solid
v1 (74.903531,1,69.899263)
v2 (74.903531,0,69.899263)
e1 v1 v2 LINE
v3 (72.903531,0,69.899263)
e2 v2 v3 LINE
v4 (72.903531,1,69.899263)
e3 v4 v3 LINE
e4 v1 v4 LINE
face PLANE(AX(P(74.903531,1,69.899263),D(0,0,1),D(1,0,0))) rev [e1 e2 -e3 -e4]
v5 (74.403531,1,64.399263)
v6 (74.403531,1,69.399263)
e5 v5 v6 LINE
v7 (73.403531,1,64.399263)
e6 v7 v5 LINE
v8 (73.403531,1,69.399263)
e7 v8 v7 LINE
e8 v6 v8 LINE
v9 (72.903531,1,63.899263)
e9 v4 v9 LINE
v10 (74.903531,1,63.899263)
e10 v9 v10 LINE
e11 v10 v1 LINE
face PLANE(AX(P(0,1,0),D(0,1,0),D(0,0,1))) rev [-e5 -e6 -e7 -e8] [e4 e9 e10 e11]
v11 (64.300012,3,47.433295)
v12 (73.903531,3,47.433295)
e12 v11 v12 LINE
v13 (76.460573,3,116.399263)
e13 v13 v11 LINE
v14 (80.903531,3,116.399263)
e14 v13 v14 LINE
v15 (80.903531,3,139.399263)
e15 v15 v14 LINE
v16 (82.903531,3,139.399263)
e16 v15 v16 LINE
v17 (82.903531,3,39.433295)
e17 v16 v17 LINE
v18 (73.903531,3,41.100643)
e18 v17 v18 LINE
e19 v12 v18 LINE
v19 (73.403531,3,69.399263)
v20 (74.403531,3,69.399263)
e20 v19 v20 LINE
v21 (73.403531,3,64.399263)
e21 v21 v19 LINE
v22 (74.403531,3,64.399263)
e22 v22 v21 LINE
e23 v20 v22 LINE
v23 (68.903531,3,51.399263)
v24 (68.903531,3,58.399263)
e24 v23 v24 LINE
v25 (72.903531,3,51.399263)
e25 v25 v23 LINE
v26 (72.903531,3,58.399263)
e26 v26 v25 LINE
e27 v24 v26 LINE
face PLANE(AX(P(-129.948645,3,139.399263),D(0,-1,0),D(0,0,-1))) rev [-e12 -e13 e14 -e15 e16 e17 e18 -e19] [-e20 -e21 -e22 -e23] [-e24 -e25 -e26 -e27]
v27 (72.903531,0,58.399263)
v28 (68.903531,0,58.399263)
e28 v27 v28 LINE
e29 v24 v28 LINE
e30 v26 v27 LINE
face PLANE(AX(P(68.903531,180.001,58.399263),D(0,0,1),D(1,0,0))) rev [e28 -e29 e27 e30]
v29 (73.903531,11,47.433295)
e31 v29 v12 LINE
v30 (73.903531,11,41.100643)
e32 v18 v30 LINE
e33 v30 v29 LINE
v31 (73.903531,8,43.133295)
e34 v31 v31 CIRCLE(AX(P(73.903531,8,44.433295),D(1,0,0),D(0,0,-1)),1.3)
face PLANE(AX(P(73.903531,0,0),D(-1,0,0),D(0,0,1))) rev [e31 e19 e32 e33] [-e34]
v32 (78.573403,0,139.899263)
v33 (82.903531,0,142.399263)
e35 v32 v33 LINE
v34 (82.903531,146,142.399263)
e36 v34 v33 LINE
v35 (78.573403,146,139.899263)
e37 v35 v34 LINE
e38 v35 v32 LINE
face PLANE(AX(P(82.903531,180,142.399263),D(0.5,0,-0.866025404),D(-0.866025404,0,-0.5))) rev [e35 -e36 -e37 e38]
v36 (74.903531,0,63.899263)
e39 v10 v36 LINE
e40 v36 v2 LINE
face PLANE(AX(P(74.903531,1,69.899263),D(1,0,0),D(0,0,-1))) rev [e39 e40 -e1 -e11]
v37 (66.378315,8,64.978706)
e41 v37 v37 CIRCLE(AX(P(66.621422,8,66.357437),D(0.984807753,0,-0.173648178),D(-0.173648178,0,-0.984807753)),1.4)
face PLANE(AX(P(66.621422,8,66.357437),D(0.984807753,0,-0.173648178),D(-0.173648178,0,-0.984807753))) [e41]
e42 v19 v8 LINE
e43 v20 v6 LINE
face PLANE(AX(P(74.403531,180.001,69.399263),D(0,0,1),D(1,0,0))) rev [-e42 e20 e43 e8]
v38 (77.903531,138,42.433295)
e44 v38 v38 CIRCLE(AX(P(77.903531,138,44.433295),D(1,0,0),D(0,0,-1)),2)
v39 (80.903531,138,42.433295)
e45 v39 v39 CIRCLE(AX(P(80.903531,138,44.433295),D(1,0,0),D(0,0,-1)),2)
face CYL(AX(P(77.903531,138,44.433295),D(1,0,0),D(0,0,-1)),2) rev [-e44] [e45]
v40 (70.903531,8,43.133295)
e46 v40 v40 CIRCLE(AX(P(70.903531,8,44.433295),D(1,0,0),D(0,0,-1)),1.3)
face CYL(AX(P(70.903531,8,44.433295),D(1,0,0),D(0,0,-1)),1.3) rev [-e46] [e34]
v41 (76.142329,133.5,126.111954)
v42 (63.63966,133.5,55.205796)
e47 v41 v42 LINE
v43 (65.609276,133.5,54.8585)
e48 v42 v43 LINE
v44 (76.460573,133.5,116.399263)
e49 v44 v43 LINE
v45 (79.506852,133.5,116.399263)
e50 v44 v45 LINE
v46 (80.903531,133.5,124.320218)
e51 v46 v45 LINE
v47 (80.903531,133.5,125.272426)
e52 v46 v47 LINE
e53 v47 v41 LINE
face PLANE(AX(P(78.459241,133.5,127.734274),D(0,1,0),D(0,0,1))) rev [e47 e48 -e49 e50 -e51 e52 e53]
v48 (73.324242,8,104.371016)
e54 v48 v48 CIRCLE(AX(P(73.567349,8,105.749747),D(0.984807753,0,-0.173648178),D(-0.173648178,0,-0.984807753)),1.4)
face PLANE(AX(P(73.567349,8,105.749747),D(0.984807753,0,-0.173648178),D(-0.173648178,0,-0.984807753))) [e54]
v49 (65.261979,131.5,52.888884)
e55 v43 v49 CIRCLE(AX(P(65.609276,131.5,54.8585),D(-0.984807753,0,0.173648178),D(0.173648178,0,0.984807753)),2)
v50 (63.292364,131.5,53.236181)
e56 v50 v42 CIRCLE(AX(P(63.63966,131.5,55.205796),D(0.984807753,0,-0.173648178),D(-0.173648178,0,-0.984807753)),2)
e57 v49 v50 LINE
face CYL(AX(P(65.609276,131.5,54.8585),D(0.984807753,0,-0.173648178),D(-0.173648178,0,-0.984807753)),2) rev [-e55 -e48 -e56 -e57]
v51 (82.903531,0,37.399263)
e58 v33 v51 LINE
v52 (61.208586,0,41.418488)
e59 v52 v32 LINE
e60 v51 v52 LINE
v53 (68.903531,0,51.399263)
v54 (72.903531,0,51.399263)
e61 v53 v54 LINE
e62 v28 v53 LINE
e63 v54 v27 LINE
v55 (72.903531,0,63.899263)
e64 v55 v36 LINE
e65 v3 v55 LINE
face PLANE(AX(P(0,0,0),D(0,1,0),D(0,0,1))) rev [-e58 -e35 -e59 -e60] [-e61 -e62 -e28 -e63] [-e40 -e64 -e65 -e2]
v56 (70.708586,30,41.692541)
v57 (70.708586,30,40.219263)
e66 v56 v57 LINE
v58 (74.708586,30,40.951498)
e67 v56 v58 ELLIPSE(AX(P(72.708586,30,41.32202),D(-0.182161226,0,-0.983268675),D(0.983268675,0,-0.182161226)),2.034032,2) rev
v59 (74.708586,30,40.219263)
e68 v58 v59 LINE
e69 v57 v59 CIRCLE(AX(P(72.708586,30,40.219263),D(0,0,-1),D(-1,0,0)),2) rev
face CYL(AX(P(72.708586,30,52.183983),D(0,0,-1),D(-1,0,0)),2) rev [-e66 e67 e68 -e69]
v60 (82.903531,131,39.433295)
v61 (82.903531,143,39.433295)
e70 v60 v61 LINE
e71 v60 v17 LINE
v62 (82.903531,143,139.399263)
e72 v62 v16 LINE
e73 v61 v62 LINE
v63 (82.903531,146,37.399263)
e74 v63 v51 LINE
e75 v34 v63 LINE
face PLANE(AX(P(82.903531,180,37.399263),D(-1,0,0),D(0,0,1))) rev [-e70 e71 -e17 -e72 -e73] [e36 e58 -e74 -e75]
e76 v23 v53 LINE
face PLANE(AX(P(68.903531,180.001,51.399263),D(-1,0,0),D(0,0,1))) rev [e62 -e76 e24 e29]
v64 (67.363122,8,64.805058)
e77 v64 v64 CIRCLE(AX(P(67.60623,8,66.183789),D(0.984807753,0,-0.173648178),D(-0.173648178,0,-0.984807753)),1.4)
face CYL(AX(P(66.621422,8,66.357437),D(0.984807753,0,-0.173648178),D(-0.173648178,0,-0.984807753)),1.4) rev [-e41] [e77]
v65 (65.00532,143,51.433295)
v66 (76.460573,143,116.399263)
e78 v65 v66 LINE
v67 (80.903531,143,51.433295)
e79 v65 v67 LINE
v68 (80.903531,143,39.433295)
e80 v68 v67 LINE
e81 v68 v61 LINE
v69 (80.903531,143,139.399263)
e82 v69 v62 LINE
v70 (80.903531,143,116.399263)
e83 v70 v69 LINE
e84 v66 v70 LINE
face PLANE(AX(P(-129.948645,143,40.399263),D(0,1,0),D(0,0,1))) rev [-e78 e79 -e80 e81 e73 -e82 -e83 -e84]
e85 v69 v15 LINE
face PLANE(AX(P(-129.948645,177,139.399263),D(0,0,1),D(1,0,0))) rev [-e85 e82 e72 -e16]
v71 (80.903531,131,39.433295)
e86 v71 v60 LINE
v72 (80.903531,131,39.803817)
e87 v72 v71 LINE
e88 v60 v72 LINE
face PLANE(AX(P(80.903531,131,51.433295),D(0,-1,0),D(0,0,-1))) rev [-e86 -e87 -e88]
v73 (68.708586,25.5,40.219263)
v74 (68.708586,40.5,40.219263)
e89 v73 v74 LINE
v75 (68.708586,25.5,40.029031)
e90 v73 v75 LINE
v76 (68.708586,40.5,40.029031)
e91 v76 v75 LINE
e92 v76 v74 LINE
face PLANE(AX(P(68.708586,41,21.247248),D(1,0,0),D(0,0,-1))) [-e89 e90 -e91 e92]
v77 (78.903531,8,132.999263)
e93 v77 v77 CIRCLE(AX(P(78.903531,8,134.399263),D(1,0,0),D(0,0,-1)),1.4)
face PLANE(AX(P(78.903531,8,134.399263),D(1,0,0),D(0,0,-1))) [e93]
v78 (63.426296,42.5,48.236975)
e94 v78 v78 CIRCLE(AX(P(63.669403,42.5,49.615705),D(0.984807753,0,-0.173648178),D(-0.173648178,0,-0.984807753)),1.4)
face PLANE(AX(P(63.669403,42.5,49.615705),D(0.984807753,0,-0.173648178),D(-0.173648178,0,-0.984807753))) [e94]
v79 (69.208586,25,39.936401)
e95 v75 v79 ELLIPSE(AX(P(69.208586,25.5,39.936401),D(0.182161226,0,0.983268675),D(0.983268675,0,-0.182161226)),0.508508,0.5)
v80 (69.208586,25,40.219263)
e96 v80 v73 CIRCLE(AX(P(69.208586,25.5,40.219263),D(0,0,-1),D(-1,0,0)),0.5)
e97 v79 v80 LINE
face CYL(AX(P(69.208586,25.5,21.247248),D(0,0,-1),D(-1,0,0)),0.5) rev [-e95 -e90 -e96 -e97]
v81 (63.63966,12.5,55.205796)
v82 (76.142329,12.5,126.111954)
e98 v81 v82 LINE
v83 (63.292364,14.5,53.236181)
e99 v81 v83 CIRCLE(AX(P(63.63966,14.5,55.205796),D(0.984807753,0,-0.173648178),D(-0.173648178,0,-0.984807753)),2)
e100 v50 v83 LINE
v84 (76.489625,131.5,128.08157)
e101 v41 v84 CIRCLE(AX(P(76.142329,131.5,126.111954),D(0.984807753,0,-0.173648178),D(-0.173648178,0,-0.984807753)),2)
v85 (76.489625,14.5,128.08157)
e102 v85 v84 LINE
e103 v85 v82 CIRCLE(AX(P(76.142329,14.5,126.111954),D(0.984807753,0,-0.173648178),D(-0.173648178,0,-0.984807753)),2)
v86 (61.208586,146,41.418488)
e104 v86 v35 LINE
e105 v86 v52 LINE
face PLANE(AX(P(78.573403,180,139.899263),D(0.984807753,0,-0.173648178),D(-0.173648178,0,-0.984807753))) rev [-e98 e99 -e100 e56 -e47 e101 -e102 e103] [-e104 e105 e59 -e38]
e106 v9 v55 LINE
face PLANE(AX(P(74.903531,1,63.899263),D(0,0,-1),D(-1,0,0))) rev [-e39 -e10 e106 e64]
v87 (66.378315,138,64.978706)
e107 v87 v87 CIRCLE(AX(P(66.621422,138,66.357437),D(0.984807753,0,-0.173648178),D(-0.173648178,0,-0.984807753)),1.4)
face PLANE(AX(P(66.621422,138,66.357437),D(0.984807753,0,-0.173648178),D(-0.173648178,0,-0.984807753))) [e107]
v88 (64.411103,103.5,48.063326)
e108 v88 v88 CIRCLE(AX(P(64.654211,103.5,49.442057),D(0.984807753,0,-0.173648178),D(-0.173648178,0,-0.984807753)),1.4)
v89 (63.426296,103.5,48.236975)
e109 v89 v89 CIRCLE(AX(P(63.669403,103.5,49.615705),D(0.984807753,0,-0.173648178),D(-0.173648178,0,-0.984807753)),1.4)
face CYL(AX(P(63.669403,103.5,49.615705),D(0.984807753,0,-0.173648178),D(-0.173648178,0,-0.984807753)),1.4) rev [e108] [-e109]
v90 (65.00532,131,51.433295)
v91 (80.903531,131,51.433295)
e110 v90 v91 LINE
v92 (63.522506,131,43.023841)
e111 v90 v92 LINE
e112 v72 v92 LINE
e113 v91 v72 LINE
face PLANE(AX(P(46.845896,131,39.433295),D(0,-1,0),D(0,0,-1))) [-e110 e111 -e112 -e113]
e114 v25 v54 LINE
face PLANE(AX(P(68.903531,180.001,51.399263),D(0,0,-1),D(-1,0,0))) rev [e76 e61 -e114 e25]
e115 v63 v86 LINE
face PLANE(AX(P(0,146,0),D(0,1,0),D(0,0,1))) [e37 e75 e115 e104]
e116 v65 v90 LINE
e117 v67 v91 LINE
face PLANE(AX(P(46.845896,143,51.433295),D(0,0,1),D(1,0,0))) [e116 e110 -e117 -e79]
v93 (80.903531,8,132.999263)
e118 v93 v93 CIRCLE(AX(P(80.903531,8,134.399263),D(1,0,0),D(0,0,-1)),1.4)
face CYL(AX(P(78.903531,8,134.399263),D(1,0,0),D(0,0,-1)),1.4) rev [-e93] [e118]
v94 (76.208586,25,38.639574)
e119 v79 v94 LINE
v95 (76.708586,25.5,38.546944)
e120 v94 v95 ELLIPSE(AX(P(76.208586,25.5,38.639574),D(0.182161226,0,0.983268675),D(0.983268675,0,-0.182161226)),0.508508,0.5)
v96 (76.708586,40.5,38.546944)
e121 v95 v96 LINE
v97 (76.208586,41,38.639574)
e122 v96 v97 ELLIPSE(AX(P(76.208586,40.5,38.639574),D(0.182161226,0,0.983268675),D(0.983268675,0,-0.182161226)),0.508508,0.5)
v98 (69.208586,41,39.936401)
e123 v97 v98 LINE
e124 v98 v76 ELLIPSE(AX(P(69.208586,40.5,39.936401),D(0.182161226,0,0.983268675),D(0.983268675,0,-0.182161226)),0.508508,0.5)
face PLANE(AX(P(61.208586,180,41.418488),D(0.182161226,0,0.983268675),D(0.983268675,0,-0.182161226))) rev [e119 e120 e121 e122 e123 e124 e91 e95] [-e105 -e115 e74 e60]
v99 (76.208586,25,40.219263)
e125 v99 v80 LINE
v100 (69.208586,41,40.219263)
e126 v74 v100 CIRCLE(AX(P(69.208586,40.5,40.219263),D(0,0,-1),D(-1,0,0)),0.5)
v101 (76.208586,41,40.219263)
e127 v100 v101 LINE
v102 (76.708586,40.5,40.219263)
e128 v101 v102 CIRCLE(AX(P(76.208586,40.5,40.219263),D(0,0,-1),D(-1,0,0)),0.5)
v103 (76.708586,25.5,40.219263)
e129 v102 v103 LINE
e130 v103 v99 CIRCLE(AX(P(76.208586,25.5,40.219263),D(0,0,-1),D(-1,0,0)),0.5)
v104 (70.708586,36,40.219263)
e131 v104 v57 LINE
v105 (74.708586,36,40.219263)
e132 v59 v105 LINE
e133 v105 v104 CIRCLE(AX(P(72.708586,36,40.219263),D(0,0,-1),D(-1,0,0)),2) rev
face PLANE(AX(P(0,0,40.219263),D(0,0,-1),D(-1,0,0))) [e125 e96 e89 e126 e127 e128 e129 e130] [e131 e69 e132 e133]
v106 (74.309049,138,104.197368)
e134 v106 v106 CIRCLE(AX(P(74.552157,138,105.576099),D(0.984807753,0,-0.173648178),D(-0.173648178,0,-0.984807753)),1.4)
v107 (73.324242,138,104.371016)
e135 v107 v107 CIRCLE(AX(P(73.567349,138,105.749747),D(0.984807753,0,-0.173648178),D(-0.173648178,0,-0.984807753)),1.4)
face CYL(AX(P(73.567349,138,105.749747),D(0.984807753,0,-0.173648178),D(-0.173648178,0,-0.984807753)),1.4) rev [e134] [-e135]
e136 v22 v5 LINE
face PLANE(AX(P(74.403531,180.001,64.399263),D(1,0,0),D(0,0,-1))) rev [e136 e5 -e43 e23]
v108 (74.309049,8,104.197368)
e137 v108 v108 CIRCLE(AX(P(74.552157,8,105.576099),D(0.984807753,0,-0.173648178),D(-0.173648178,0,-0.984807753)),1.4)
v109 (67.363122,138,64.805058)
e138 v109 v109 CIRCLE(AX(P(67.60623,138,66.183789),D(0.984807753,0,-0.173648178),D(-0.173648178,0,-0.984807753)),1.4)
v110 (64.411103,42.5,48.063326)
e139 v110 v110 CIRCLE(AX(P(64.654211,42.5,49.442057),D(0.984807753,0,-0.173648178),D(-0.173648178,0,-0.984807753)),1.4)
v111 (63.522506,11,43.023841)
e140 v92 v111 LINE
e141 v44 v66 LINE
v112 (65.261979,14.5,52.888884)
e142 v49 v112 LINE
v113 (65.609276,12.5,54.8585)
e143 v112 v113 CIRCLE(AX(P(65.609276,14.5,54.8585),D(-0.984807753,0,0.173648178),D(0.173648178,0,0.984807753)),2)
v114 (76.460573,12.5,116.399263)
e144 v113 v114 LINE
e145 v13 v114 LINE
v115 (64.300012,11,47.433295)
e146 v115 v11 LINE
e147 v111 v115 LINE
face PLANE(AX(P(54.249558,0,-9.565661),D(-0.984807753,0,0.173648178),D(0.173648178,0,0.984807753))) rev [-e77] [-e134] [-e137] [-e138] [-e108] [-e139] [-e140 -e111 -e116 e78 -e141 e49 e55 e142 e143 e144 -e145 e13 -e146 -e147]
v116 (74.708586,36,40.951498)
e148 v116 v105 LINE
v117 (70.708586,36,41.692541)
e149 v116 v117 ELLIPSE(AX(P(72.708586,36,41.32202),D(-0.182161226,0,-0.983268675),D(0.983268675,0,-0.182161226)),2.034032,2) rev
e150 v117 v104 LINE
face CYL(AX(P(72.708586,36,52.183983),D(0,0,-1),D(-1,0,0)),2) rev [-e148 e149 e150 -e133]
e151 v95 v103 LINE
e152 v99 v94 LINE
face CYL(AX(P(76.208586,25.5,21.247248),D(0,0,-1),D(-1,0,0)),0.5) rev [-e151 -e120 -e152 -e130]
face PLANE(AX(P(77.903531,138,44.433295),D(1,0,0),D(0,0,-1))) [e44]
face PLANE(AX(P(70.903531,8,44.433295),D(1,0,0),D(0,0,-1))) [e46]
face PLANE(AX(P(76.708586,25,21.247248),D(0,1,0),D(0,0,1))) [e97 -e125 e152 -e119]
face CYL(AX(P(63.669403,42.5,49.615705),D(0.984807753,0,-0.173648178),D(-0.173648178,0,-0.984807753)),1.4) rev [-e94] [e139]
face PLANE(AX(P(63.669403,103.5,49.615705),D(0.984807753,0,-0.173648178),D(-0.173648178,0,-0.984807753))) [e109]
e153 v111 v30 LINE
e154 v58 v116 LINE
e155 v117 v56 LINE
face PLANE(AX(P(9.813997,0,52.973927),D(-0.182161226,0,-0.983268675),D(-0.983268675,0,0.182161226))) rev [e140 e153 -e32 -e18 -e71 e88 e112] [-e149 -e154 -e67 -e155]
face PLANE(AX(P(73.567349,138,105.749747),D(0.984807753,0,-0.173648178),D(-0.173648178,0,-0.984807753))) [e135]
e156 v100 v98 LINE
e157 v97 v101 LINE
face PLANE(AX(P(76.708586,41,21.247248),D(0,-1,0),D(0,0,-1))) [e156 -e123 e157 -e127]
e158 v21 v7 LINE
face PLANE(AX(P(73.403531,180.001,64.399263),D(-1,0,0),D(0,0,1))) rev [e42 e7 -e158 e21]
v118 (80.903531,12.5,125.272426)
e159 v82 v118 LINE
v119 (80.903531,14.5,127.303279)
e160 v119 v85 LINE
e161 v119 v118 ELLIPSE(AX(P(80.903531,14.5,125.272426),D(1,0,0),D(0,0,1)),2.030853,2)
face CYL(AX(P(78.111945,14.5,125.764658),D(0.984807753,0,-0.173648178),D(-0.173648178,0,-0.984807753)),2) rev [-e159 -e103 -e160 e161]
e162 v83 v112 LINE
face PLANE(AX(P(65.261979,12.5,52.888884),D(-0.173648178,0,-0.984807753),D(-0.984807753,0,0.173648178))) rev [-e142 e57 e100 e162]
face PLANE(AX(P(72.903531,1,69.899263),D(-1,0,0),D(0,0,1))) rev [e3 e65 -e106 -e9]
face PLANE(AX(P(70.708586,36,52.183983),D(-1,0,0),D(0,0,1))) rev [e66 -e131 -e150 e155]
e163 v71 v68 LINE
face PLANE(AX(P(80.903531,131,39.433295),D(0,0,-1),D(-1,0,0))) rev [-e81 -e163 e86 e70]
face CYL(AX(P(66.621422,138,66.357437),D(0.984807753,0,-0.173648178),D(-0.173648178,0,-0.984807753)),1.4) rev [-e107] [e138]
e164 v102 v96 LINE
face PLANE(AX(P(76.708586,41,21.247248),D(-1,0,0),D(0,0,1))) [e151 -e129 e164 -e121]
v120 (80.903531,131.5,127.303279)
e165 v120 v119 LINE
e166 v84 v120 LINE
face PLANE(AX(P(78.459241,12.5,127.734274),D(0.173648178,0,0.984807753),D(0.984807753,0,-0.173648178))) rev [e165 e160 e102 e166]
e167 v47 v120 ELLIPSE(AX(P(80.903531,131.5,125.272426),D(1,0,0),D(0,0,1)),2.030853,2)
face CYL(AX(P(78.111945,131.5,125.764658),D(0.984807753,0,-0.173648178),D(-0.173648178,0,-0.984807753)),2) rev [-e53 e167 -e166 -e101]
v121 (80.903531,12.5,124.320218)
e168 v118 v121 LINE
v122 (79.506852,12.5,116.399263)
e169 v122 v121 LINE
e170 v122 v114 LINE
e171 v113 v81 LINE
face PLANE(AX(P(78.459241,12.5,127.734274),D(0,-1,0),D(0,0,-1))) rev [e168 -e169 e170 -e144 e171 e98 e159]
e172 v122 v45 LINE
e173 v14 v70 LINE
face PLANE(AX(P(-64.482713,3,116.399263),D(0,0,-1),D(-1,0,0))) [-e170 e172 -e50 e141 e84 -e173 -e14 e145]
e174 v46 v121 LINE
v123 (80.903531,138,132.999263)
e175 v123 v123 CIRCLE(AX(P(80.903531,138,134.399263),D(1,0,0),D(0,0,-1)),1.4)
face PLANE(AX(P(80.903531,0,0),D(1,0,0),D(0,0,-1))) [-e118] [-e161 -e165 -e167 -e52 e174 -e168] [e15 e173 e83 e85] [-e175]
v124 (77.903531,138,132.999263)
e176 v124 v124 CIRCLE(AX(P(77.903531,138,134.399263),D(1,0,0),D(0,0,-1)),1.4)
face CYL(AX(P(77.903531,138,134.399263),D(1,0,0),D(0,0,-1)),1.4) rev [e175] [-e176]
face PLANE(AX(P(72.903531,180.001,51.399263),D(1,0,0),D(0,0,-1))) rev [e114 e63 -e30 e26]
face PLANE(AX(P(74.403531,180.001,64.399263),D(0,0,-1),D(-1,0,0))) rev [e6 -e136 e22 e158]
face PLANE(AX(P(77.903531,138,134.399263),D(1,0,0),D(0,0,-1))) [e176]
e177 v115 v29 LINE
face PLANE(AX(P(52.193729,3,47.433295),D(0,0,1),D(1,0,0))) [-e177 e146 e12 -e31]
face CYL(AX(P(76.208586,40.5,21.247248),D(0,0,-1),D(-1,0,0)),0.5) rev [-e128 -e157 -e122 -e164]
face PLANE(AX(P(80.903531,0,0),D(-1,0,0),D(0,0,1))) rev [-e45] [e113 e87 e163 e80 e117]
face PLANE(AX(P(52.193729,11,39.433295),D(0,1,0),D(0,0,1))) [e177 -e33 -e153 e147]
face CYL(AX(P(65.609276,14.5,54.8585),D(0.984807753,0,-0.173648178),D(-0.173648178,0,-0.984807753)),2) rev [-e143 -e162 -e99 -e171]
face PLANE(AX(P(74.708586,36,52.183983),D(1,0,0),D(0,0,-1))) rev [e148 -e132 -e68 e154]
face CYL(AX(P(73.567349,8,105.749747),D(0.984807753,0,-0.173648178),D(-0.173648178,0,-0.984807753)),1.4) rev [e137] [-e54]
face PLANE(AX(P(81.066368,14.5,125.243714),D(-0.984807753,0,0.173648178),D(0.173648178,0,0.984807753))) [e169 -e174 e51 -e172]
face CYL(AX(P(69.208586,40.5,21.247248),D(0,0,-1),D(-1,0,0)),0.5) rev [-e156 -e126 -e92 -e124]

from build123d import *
from build123d.topology import SkipClean

# Parameters (mm, degrees)
EXTRUDE_1_DEPTH      = 180
SKETCH_5_W           = 76
SKETCH_5_H           = 121
CUT_EXTRUDE_2_DEPTH  = 2
CUT_EXTRUDE_3_REACH  = 232.539
SKETCH_7_W           = 99
SKETCH_7_H           = 174
SKETCH_10_R          = 1.4
CUT_EXTRUDE_5_DEPTH  = 1
SKETCH_11_R          = 1.4
CUT_EXTRUDE_6_DEPTH  = 1
EXTRUDE_3_REACH      = 232.539
SKETCH_12_W          = 23
SKETCH_12_H          = 140
SKETCH_13_W          = 11.509871418
SKETCH_13_H          = 121
CUT_EXTRUDE_7_DEPTH  = 2
SKETCH_17_W          = 22.064106518
SKETCH_17_H          = 180
EXTRUDE_9_DEPTH      = 2
CUT_EXTRUDE_9_DEPTH  = 180
CUT_EXTRUDE_10_DEPTH = 174
SKETCH_20_W          = 23
SKETCH_20_H          = 140
CUT_EXTRUDE_11_DEPTH = 2
EXTRUDE_10_REACH     = 232.359
SKETCH_23_W          = 12
SKETCH_23_H          = 12
FILLET_4_R           = 2
CUT_EXTRUDE_15_REACH = 243.825
EXTRUDE_11_REACH     = 232.539
SKETCH_27_W          = 8
SKETCH_27_H          = 8
SKETCH_28_W          = 8
SKETCH_28_H          = 8
CUT_EXTRUDE_16_DEPTH = 9
EXTRUDE_12_DEPTH     = 8
CUT_EXTRUDE_17_REACH = 243.825
CUT_EXTRUDE_18_REACH = 246.03
SKETCH_31_W          = 4
SKETCH_31_H          = 7
CUT_EXTRUDE_23_REACH = 225.195
CUT_EXTRUDE_25_REACH = 224.966
SKETCH_35_W          = 8
SKETCH_35_H          = 16
FILLET_5_R           = 0.5
CUT_EXTRUDE_26_REACH = 246.03
SKETCH_36_W          = 1
SKETCH_36_H          = 5
SKETCH_37_W          = 2
SKETCH_37_H          = 6
CUT_EXTRUDE_27_DEPTH = 1
SKETCH_38_R          = 1.3
CUT_EXTRUDE_28_DEPTH = 3
SKETCH_39_R          = 2
CUT_EXTRUDE_30_DEPTH = 3
SKETCH_40_R          = 1.4
CUT_EXTRUDE_31_DEPTH = 2
CUT_EXTRUDE_34_DEPTH = 2
CUT_EXTRUDE_35_DEPTH = 1
SKETCH_45_W          = 45.630615172
SKETCH_45_H          = 107.719789164
CUT_EXTRUDE_36_DEPTH = 34
SKETCH_47_R          = 1.4
CUT_EXTRUDE_37_DEPTH = 3
EXTRUDE_13_REACH     = 207.096
SKETCH_48_W          = 12
SKETCH_48_H          = 12
SKETCH_50_W          = 12
SKETCH_50_H          = 12
CUT_EXTRUDE_38_DEPTH = 2
SKETCH_51_R          = 2
CUT_EXTRUDE_39_DEPTH = 3
CUT_EXTRUDE_40_DEPTH = 211.503077075


with BuildPart() as part:
    # 草图1 → 凸台-拉伸1 (new body)
    with BuildSketch(Plane(origin=(0, 0, 0), x_dir=(1, 0, 0), z_dir=(0, 1, 0))):
        Polygon((82.903530501, -37.399262949), (82.903530501, -142.399262949), (78.573403482, -139.899262949), (61.208585715, -41.418487648), align=None)
    extrude(amount=EXTRUDE_1_DEPTH)

    # 草图5 → 切除-拉伸2 (cut)
    with BuildSketch(Plane(origin=(52.279942479, 0, -9.218364409), x_dir=(0.17364817766692414, 0, 0.9848077530122091), z_dir=(-0.9848077530122091, 0, 0.17364817766692414))):
        with Locations((101.418007121, 73)):
            Rectangle(SKETCH_5_W, SKETCH_5_H)
    extrude(amount=-CUT_EXTRUDE_2_DEPTH, mode=Mode.SUBTRACT)

    # 切除-拉伸3: up to this plane
    cut_extrude_3_end = Plane(origin=(54.249557985, 0, -9.565660764), z_dir=(-0.9848077530122091, 0, 0.17364817766692406))
    # 草图7 → 切除-拉伸3 (cut, up to the surface)
    with BuildSketch(Plane(origin=(82.903530501, 0, 0), x_dir=(0, 0, -1), z_dir=(1, 0, 0)), mode=Mode.PRIVATE) as cut_extrude_3_sk1:
        with Locations((-89.899262949, 90)):
            Rectangle(SKETCH_7_W, SKETCH_7_H)
    cut_extrude_3_tool1 = split(extrude(cut_extrude_3_sk1.sketch, amount=-CUT_EXTRUDE_3_REACH, mode=Mode.PRIVATE), bisect_by=cut_extrude_3_end, keep=Keep.BOTH, mode=Mode.PRIVATE)
    add(cut_extrude_3_tool1.solids().sort_by_distance((82.903531, 90, 89.899263))[0], mode=Mode.SUBTRACT)

    # 草图10 → 切除-拉伸5 (cut)
    with BuildSketch(Plane(origin=(54.249557985, 0, -9.565660764), x_dir=(-0.1736481776669242, 0, -0.9848077530122091), z_dir=(0.9848077530122091, 0, -0.1736481776669242))):
        with Locations((-59.918007121, 103.5)):
            Circle(SKETCH_10_R)
        with Locations((-59.918007121, 42.5)):
            Circle(SKETCH_10_R)
    extrude(amount=-CUT_EXTRUDE_5_DEPTH, mode=Mode.SUBTRACT)

    # 草图11 → 切除-拉伸6 (cut)
    with BuildSketch(Plane(origin=(54.249557985, 0, -9.565660764), x_dir=(-0.1736481776669242, 0, -0.9848077530122091), z_dir=(0.9848077530122091, 0, -0.1736481776669242))):
        with Locations((-116.918007121, 138)):
            Circle(SKETCH_11_R)
        with Locations((-76.918007121, 138)):
            Circle(SKETCH_11_R)
        with Locations((-116.918007121, 8)):
            Circle(SKETCH_11_R)
        with Locations((-76.918007121, 8)):
            Circle(SKETCH_11_R)
    extrude(amount=-CUT_EXTRUDE_6_DEPTH, mode=Mode.SUBTRACT)

    # 凸台-拉伸3: up to this plane
    extrude_3_end = Plane(origin=(54.249557985, 0, -9.565660764), z_dir=(-0.9848077530122091, 0, 0.17364817766692406))
    # 草图12 → 凸台-拉伸3 (add, up to the surface)
    with BuildSketch(Plane(origin=(82.903530501, 0, 0), x_dir=(0, 0, -1), z_dir=(1, 0, 0)), mode=Mode.PRIVATE) as extrude_3_sk1:
        with Locations((-127.899262949, 73)):
            Rectangle(SKETCH_12_W, SKETCH_12_H)
    extrude_3_tool1 = split(extrude(extrude_3_sk1.sketch, amount=-EXTRUDE_3_REACH, mode=Mode.PRIVATE), bisect_by=extrude_3_end, keep=Keep.BOTH, mode=Mode.PRIVATE)
    add(extrude_3_tool1.solids().sort_by_distance((82.903531, 73, 127.899263))[0])

    # 草图13 → 切除-拉伸7 (cut)
    with BuildSketch(Plane(origin=(54.249557985, 0, -9.565660764), x_dir=(0.1736481776669242, 0, 0.9848077530122091), z_dir=(-0.9848077530122091, 0, 0.1736481776669242))):
        with Locations((133.663071412, 73)):
            Rectangle(SKETCH_13_W, SKETCH_13_H)
    extrude(amount=-CUT_EXTRUDE_7_DEPTH, mode=Mode.SUBTRACT)

    # 草图17 → 凸台-拉伸9 (add)
    with BuildSketch(Plane(origin=(9.44967418, 0, 51.007389472), x_dir=(-0.9832686752161511, 0, 0.18216122622192457), z_dir=(-0.18216122622192457, 0, -0.9832686752161512))):
        with Locations((-63.671695749, 90)):
            Rectangle(SKETCH_17_W, SKETCH_17_H)
    extrude(amount=-EXTRUDE_9_DEPTH)

    # 草图18 → 切除-拉伸9 (cut)
    with BuildSketch(Plane.XZ):
        Polygon((82.903530501, 39.433295), (82.903530501, 37.399262949), (83.267852953, 39.3658003), align=None)
    extrude(amount=-CUT_EXTRUDE_9_DEPTH, mode=Mode.SUBTRACT)

    # 草图19 → 切除-拉伸10 (cut)
    with BuildSketch(Plane(origin=(0, 3, 0), x_dir=(1, 0, 0), z_dir=(0, 1, 0))):
        Polygon((77.596007668, -40.416571384), (82.903530501, -39.433295), (82.903530501, -40.399262949), align=None)
    extrude(amount=CUT_EXTRUDE_10_DEPTH, mode=Mode.SUBTRACT)

    # 草图20 → 切除-拉伸11 (cut)
    with BuildSketch(Plane(origin=(82.903530501, 0, 0), x_dir=(0, 0, -1), z_dir=(1, 0, 0))):
        with Locations((-127.899262949, 73)):
            Rectangle(SKETCH_20_W, SKETCH_20_H)
    extrude(amount=-CUT_EXTRUDE_11_DEPTH, mode=Mode.SUBTRACT)

    # 凸台-拉伸10: up to this plane
    extrude_10_end = Plane(origin=(54.249557985, 0, -9.565660764), z_dir=(-0.9848077530122091, 0, 0.17364817766692406))
    # 草图23 → 凸台-拉伸10 (add, up to the surface)
    with BuildSketch(Plane(origin=(80.903530501, 0, 0), x_dir=(0, 0, -1), z_dir=(1, 0, 0)), mode=Mode.PRIVATE) as extrude_10_sk1:
        with Locations((-133.399262949, 9)):
            Rectangle(SKETCH_23_W, SKETCH_23_H)
    extrude_10_tool1 = split(extrude(extrude_10_sk1.sketch, amount=-EXTRUDE_10_REACH, mode=Mode.PRIVATE), bisect_by=extrude_10_end, keep=Keep.BOTH, mode=Mode.PRIVATE)
    add(extrude_10_tool1.solids().sort_by_distance((80.903531, 9, 133.399263))[0])
    # 草图23 → 凸台-拉伸10 (add, up to the surface)
    with BuildSketch(Plane(origin=(80.903530501, 0, 0), x_dir=(0, 0, -1), z_dir=(1, 0, 0)), mode=Mode.PRIVATE) as extrude_10_sk2:
        with Locations((-45.433295, 171)):
            Rectangle(SKETCH_23_W, SKETCH_23_H)
    extrude_10_tool2 = split(extrude(extrude_10_sk2.sketch, amount=-EXTRUDE_10_REACH, mode=Mode.PRIVATE), bisect_by=extrude_10_end, keep=Keep.BOTH, mode=Mode.PRIVATE)
    add(extrude_10_tool2.solids().sort_by_distance((80.903531, 171, 45.433295))[0])
    # 草图23 → 凸台-拉伸10 (add, up to the surface)
    with BuildSketch(Plane(origin=(80.903530501, 0, 0), x_dir=(0, 0, -1), z_dir=(1, 0, 0)), mode=Mode.PRIVATE) as extrude_10_sk3:
        with Locations((-133.399262949, 171)):
            Rectangle(SKETCH_23_W, SKETCH_23_H)
    extrude_10_tool3 = split(extrude(extrude_10_sk3.sketch, amount=-EXTRUDE_10_REACH, mode=Mode.PRIVATE), bisect_by=extrude_10_end, keep=Keep.BOTH, mode=Mode.PRIVATE)
    add(extrude_10_tool3.solids().sort_by_distance((80.903531, 171, 133.399263))[0])

    # 圆角4
    # the kernel refuses this fillet: 2 mm, written as the material it adds along each edge
    with BuildSketch(Plane(origin=(63.292363847, 133.5, 53.236180684), x_dir=(0, -1, 0), z_dir=(0.9848077530122091, 0, -0.17364817766692414)), Plane(origin=(63.292363847, 12.5, 53.236180684), x_dir=(0.17364817766692411, -2.4868995751603412e-14, 0.9848077530122092), z_dir=(0.9848077530122091, 0, -0.17364817766692414))) as fillet_4_piece_1:
        with BuildLine():
            CenterArc((FILLET_4_R, -FILLET_4_R), FILLET_4_R, 90, 90)
            Line((0, -FILLET_4_R), (0, 0))
            Line((0, 0), (FILLET_4_R, 0))
        make_face()
    extrude(amount=2)
    with BuildSketch(Plane(origin=(80.428856362, 133.5, 127.386977203), x_dir=(0, -1, 0), z_dir=(-0.9848077530122102, 0, 0.17364817766691837))) as fillet_4_piece_2:
        with BuildLine():
            CenterArc((FILLET_4_R, -FILLET_4_R), FILLET_4_R, 90, 90)
            Line((0, -FILLET_4_R), (0, 0))
            Line((0, 0), (FILLET_4_R, 0))
        make_face()
    extrude(amount=4)
    with BuildSketch(Plane(origin=(76.48962535, 12.5, 128.081569913), x_dir=(-0.17364817766691837, 0, -0.9848077530122102), z_dir=(0.9848077530122102, 0, -0.17364817766691837))) as fillet_4_piece_3:
        with BuildLine():
            CenterArc((FILLET_4_R, FILLET_4_R), FILLET_4_R, 180, 90)
            Line((0, FILLET_4_R), (0, 0))
            Line((0, 0), (FILLET_4_R, 0))
        make_face()
    extrude(amount=2)
    with BuildSketch(Plane(origin=(65.587064134, 12.5, 130.003985614), x_dir=(-0.17364817766691837, 0, -0.9848077530122102), z_dir=(0.9848077530122102, 0, -0.17364817766691837))) as fillet_4_piece_4_section:
        with BuildLine():
            CenterArc((FILLET_4_R, FILLET_4_R), FILLET_4_R, 180, 90)
            Line((0, FILLET_4_R), (0, 0))
            Line((0, 0), (FILLET_4_R, 0))
        make_face()
    fillet_4_piece_4 = extrude(amount=15.070750796, mode=Mode.PRIVATE)
    fillet_4_piece_4 = split(fillet_4_piece_4, bisect_by=Plane(origin=(65.587064134, 12.5, 127.399262949), z_dir=(0, 0, 1)), keep=Keep.TOP, mode=Mode.PRIVATE)
    fillet_4_piece_4 = split(fillet_4_piece_4, bisect_by=Plane(origin=(76.48962535, 12.5, 128.081569913), z_dir=(0.9848077530122091, 0, -0.17364817766692425)), keep=Keep.TOP, mode=Mode.PRIVATE)
    add(fillet_4_piece_4)
    with BuildSketch(Plane(origin=(65.587064134, 12.5, 130.003985614), x_dir=(-0.17364817766691837, 0, -0.9848077530122102), z_dir=(0.9848077530122102, 0, -0.17364817766691837))) as fillet_4_piece_5_section:
        with BuildLine():
            CenterArc((FILLET_4_R, FILLET_4_R), FILLET_4_R, 180, 90)
            Line((0, FILLET_4_R), (0, 0))
            Line((0, 0), (FILLET_4_R, 0))
        make_face()
    fillet_4_piece_5 = extrude(amount=15.070750796, mode=Mode.PRIVATE)
    fillet_4_piece_5 = split(fillet_4_piece_5, bisect_by=Plane(origin=(65.587064134, 12.5, 127.399262949), z_dir=(0, 0, -1)), keep=Keep.TOP, mode=Mode.PRIVATE)
    fillet_4_piece_5 = split(fillet_4_piece_5, bisect_by=Plane(origin=(76.48962535, 12.5, 128.081569913), z_dir=(0.9848077530122091, 0, -0.17364817766692425)), keep=Keep.TOP, mode=Mode.PRIVATE)
    add(fillet_4_piece_5)

    # 草图26 → 切除-拉伸15 (cut, up to next)
    with BuildSketch(Plane(origin=(0, 177, 0), x_dir=(1, 0, 0), z_dir=(0, 1, 0)), mode=Mode.PRIVATE) as cut_extrude_15_sk1:
        Polygon((63.175196657, -41.054151562), (71.924245603, -39.433295), (62.889395913, -39.433295), align=None)
    cut_extrude_15_tool1 = extrude(cut_extrude_15_sk1.sketch, amount=-CUT_EXTRUDE_15_REACH, mode=Mode.PRIVATE) & part.part
    add(cut_extrude_15_tool1.solids().sort_by_distance((65.996279, 177, 39.973581))[0], mode=Mode.SUBTRACT)

    # 凸台-拉伸11: up to this plane
    extrude_11_end = Plane(origin=(54.249557985, 0, -9.565660764), z_dir=(-0.9848077530122091, 0, 0.17364817766692406))
    # 草图27 → 凸台-拉伸11 (add, up to the surface)
    with BuildSketch(Plane(origin=(82.903530501, 0, 0), x_dir=(0, 0, -1), z_dir=(1, 0, 0)), mode=Mode.PRIVATE) as extrude_11_sk1:
        with Locations((-43.433295, 7)):
            Rectangle(SKETCH_27_W, SKETCH_27_H)
    extrude_11_tool1 = split(extrude(extrude_11_sk1.sketch, amount=-EXTRUDE_11_REACH, mode=Mode.PRIVATE), bisect_by=extrude_11_end, keep=Keep.BOTH, mode=Mode.PRIVATE)
    add(extrude_11_tool1.solids().sort_by_distance((82.903531, 7, 43.433295))[0])

    # 草图28 → 切除-拉伸16 (cut)
    with BuildSketch(Plane(origin=(82.903530501, 0, 0), x_dir=(0, 0, -1), z_dir=(1, 0, 0))):
        with Locations((-43.433295, 7)):
            Rectangle(SKETCH_28_W, SKETCH_28_H)
    extrude(amount=-CUT_EXTRUDE_16_DEPTH, mode=Mode.SUBTRACT)

    # 草图29 → 凸台-拉伸12 (add)
    with BuildSketch(Plane.XZ.offset(-11)):
        Polygon((73.903530501, 41.100642977), (73.903530501, 39.433295), (82.903530501, 39.433295), align=None)
    extrude(amount=EXTRUDE_12_DEPTH)

    # 草图30 → 切除-拉伸17 (cut, up to next)
    with BuildSketch(Plane.XZ.offset(-3), mode=Mode.PRIVATE) as cut_extrude_17_sk1:
        Polygon((71.924245603, 39.433295), (63.175196657, 41.054151562), (62.889395913, 39.433295), align=None)
    cut_extrude_17_tool1 = extrude(cut_extrude_17_sk1.sketch, amount=-CUT_EXTRUDE_17_REACH, mode=Mode.PRIVATE) & part.part
    add(cut_extrude_17_tool1.solids().sort_by_distance((65.996279, 3, 39.973581))[0], mode=Mode.SUBTRACT)

    # 草图31 → 切除-拉伸18 (cut, up to next)
    with BuildSketch(Plane.XZ, mode=Mode.PRIVATE) as cut_extrude_18_sk1:
        with Locations((70.903530501, 54.899262949)):
            Rectangle(SKETCH_31_W, SKETCH_31_H)
    cut_extrude_18_tool1 = extrude(cut_extrude_18_sk1.sketch, amount=-CUT_EXTRUDE_18_REACH, mode=Mode.PRIVATE) & part.part
    add(cut_extrude_18_tool1.solids().sort_by_distance((70.903531, 0, 54.899263))[0], mode=Mode.SUBTRACT)

    # 切除-拉伸23: up to this plane
    cut_extrude_23_end = Plane(origin=(9.813996633, 0, 52.973926823), z_dir=(-0.18216122622192446, 0, -0.9832686752161511))
    # 草图32 → 切除-拉伸23 (cut, up to the surface)
    with BuildSketch(Plane(origin=(0, 0, 39.719262949), x_dir=(-1, 0, 0), z_dir=(0, 0, -1)), mode=Mode.PRIVATE) as cut_extrude_23_sk1:
        with BuildLine():
            Line((-70.708585715, 36), (-70.708585715, 30))
            ThreePointArc((-70.708585715, 30), (-72.708585715, 28), (-74.708585715, 30))
            Line((-74.708585715, 30), (-74.708585715, 36))
            ThreePointArc((-74.708585715, 36), (-72.708585715, 38), (-70.708585715, 36))
        make_face()
    cut_extrude_23_tool1 = split(extrude(cut_extrude_23_sk1.sketch, amount=-CUT_EXTRUDE_23_REACH, mode=Mode.PRIVATE), bisect_by=cut_extrude_23_end, keep=Keep.BOTH, mode=Mode.PRIVATE)
    add(cut_extrude_23_tool1.solids().sort_by_distance((72.708586, 33, 39.719263))[0], mode=Mode.SUBTRACT)

    # 切除-拉伸25: up to this plane
    cut_extrude_25_end = Plane(origin=(61.208585715, 180, 41.418487648), z_dir=(0.18216122622192454, 0, 0.9832686752161511))
    # 草图35 → 切除-拉伸25 (cut, up to the surface)
    with BuildSketch(Plane(origin=(0, 0, 40.219262949), x_dir=(-1, 0, 0), z_dir=(0, 0, -1)), mode=Mode.PRIVATE) as cut_extrude_25_sk1:
        with Locations((-72.708585715, 33)):
            Rectangle(SKETCH_35_W, SKETCH_35_H)
    cut_extrude_25_tool1 = split(extrude(cut_extrude_25_sk1.sketch, amount=CUT_EXTRUDE_25_REACH, mode=Mode.PRIVATE), bisect_by=cut_extrude_25_end, keep=Keep.BOTH, mode=Mode.PRIVATE)
    add(cut_extrude_25_tool1.solids().sort_by_distance((72.708586, 33, 40.219263))[0], mode=Mode.SUBTRACT)

    # 圆角5
    fillet_5_edges = [part.edges().sort_by_distance(p)[0] for p in [
        (68.708585715, 41, 40.124146975),
        (68.708585715, 25, 40.124146975),
        (76.708585715, 25, 39.38310343),
        (76.708585715, 41, 39.38310343),
    ]]
    fillet(fillet_5_edges, radius=FILLET_5_R)

    # 草图36 → 切除-拉伸26 (cut, up to next)
    with BuildSketch(Plane.XZ, mode=Mode.PRIVATE) as cut_extrude_26_sk1:
        with Locations((73.903530501, 66.899262949)):
            Rectangle(SKETCH_36_W, SKETCH_36_H)
    cut_extrude_26_tool1 = extrude(cut_extrude_26_sk1.sketch, amount=-CUT_EXTRUDE_26_REACH, mode=Mode.PRIVATE) & part.part
    add(cut_extrude_26_tool1.solids().sort_by_distance((73.903531, 0, 66.899263))[0], mode=Mode.SUBTRACT)

    # 草图37 → 切除-拉伸27 (cut)
    with BuildSketch(Plane.XZ):
        with Locations((73.903530501, 66.899262949)):
            Rectangle(SKETCH_37_W, SKETCH_37_H)
    extrude(amount=-CUT_EXTRUDE_27_DEPTH, mode=Mode.SUBTRACT)

    # 草图38 → 切除-拉伸28 (cut)
    with BuildSketch(Plane(origin=(73.903530501, 0, 0), x_dir=(0, 0, -1), z_dir=(1, 0, 0))):
        with Locations((-44.433295, 8)):
            Circle(SKETCH_38_R)
    extrude(amount=-CUT_EXTRUDE_28_DEPTH, mode=Mode.SUBTRACT)

    # 草图39 → 切除-拉伸30 (cut)
    with BuildSketch(Plane(origin=(80.903530501, 0, 0), x_dir=(0, 0, -1), z_dir=(1, 0, 0))):
        with Locations((-44.433295, 172)):
            Circle(SKETCH_39_R)
    extrude(amount=-CUT_EXTRUDE_30_DEPTH, mode=Mode.SUBTRACT)

    # 草图40 → 切除-拉伸31 (cut)
    with BuildSketch(Plane(origin=(80.903530501, 0, 0), x_dir=(0, 0, -1), z_dir=(1, 0, 0))):
        with Locations((-134.399262949, 172)):
            Circle(SKETCH_40_R)
        with Locations((-134.399262949, 8)):
            Circle(SKETCH_40_R)
    extrude(amount=-CUT_EXTRUDE_31_DEPTH, mode=Mode.SUBTRACT)

    # 草图42 → 切除-拉伸34 (cut)
    with SkipClean():  # the faces are left unmerged after this step: merging them gives an invalid solid
        with BuildSketch(Plane(origin=(54.249557985, 0, -9.565660764), x_dir=(0.17364817766692428, 0, 0.9848077530122091), z_dir=(-0.9848077530122092, 0, 0.17364817766692428))):
            with BuildLine():
                Line((139.077828434, 15), (139.077828434, 13.384207363))
                ThreePointArc((139.077828434, 13.384207363), (139.331073067, 13.916751608), (139.418007121, 14.5))
                Line((139.418007121, 14.5), (139.418007121, 15))
                Line((139.418007121, 15), (139.077828434, 15))
            make_face()
        extrude(amount=-CUT_EXTRUDE_34_DEPTH, mode=Mode.SUBTRACT)

    # 草图43 → 切除-拉伸35 (cut)
    with SkipClean():  # the faces are left unmerged after this step: merging them gives an invalid solid
        with BuildSketch(Plane(origin=(56.219173491, 0, -9.91295712), x_dir=(0.17364817766692442, 0, 0.9848077530122091), z_dir=(-0.9848077530122091, 0, 0.17364817766692442))):
            with BuildLine():
                Line((139.418007121, 14.5), (139.418007121, 131.5))
                ThreePointArc((139.418007121, 131.5), (138.832220683, 132.914213562), (137.418007121, 133.5))
                Line((137.418007121, 133.5), (128.260789665, 133.5))
                Line((128.260789665, 133.5), (128.260789665, 12.5))
                Line((128.260789665, 12.5), (137.418007121, 12.5))
                ThreePointArc((137.418007121, 12.5), (138.832220683, 13.085786438), (139.418007121, 14.5))
            make_face()
        extrude(amount=-CUT_EXTRUDE_35_DEPTH, mode=Mode.SUBTRACT)

    # 草图45 → 切除-拉伸36 (cut)
    with SkipClean():  # the faces are left unmerged after this step: merging them gives an invalid solid
        with BuildSketch(Plane(origin=(0, 143, 0), x_dir=(-1, 0, 0), z_dir=(0, -1, 0))):
            with Locations((-69.740033364, -89.554323094)):
                Rectangle(SKETCH_45_W, SKETCH_45_H)
        extrude(amount=-CUT_EXTRUDE_36_DEPTH, mode=Mode.SUBTRACT)


with BuildPart() as cut_extrude_36_piece_1:
    # of the separate pieces the step leaves, piece 1, a body of its own (cut_extrude_36_pieces)
    add(part.part.solids().sort_by_distance((61.208585715, 0, 41.418487648))[0])


with BuildPart() as cut_extrude_36_piece_2:
    # of the separate pieces the step leaves, piece 2, a body of its own (cut_extrude_36_pieces)
    add(part.part.solids().sort_by_distance((61.208585715, 177, 41.418487648))[0])


with BuildPart() as cut_extrude_36_piece_2_1:
    # Move Body 1: read off the stored shape, not the designer's step
    # Move Body 1: moved
    add(cut_extrude_36_piece_2.part.moved(Location((0, -34, 0))))


with BuildPart() as cut_extrude_36_piece_1_1:
    add(cut_extrude_36_piece_1.part)

    # Combine 1: union 切除-拉伸36 piece 2
    add(cut_extrude_36_piece_2_1.part)

    # 草图47 → 切除-拉伸37 (cut)
    with SkipClean():  # the faces are left unmerged after this step: merging them gives an invalid solid
        with BuildSketch(Plane(origin=(80.903530501, 0, 0), x_dir=(0, 0, -1), z_dir=(1, 0, 0))):
            with Locations((-134.399262949, 138)):
                Circle(SKETCH_47_R)
        extrude(amount=-CUT_EXTRUDE_37_DEPTH, mode=Mode.SUBTRACT)

    # 凸台-拉伸13: up to this plane
    with SkipClean():  # the faces are left unmerged after this step: merging them gives an invalid solid
        extrude_13_end = Plane(origin=(54.249557985, 0, -9.565660764), z_dir=(-0.9848077530122091, 0, 0.17364817766692406))
        # 草图48 → 凸台-拉伸13 (add, up to the surface)
        with BuildSketch(Plane(origin=(82.903530501, 0, 0), x_dir=(0, 0, -1), z_dir=(1, 0, 0)), mode=Mode.PRIVATE) as extrude_13_sk1:
            with Locations((-45.433295, 137)):
                Rectangle(SKETCH_48_W, SKETCH_48_H)
        extrude_13_tool1 = split(extrude(extrude_13_sk1.sketch, amount=-EXTRUDE_13_REACH, mode=Mode.PRIVATE), bisect_by=extrude_13_end, keep=Keep.BOTH, mode=Mode.PRIVATE)
        add(extrude_13_tool1.solids().sort_by_distance((82.903531, 137, 45.433295))[0])

    # 草图50 → 切除-拉伸38 (cut)
    with SkipClean():  # the faces are left unmerged after this step: merging them gives an invalid solid
        with BuildSketch(Plane(origin=(82.903530501, 0, 0), x_dir=(0, 0, -1), z_dir=(1, 0, 0))):
            with Locations((-45.433295, 137)):
                Rectangle(SKETCH_50_W, SKETCH_50_H)
        extrude(amount=-CUT_EXTRUDE_38_DEPTH, mode=Mode.SUBTRACT)

    # 草图51 → 切除-拉伸39 (cut)
    with SkipClean():  # the faces are left unmerged after this step: merging them gives an invalid solid
        with BuildSketch(Plane(origin=(80.903530501, 0, 0), x_dir=(0, 0, -1), z_dir=(1, 0, 0))):
            with Locations((-44.433295, 138)):
                Circle(SKETCH_51_R)
        extrude(amount=-CUT_EXTRUDE_39_DEPTH, mode=Mode.SUBTRACT)

    # 草图52 → 切除-拉伸40 (cut, through all)
    with SkipClean():  # the faces are left unmerged after this step: merging them gives an invalid solid
        with BuildSketch(Plane.XZ.offset(-131)):
            Polygon((71.924245603, 39.433295), (63.175196657, 41.054151562), (62.889395913, 39.433295), align=None)
        extrude(amount=-CUT_EXTRUDE_40_DEPTH, mode=Mode.SUBTRACT)


solid = cut_extrude_36_piece_1_1.part
